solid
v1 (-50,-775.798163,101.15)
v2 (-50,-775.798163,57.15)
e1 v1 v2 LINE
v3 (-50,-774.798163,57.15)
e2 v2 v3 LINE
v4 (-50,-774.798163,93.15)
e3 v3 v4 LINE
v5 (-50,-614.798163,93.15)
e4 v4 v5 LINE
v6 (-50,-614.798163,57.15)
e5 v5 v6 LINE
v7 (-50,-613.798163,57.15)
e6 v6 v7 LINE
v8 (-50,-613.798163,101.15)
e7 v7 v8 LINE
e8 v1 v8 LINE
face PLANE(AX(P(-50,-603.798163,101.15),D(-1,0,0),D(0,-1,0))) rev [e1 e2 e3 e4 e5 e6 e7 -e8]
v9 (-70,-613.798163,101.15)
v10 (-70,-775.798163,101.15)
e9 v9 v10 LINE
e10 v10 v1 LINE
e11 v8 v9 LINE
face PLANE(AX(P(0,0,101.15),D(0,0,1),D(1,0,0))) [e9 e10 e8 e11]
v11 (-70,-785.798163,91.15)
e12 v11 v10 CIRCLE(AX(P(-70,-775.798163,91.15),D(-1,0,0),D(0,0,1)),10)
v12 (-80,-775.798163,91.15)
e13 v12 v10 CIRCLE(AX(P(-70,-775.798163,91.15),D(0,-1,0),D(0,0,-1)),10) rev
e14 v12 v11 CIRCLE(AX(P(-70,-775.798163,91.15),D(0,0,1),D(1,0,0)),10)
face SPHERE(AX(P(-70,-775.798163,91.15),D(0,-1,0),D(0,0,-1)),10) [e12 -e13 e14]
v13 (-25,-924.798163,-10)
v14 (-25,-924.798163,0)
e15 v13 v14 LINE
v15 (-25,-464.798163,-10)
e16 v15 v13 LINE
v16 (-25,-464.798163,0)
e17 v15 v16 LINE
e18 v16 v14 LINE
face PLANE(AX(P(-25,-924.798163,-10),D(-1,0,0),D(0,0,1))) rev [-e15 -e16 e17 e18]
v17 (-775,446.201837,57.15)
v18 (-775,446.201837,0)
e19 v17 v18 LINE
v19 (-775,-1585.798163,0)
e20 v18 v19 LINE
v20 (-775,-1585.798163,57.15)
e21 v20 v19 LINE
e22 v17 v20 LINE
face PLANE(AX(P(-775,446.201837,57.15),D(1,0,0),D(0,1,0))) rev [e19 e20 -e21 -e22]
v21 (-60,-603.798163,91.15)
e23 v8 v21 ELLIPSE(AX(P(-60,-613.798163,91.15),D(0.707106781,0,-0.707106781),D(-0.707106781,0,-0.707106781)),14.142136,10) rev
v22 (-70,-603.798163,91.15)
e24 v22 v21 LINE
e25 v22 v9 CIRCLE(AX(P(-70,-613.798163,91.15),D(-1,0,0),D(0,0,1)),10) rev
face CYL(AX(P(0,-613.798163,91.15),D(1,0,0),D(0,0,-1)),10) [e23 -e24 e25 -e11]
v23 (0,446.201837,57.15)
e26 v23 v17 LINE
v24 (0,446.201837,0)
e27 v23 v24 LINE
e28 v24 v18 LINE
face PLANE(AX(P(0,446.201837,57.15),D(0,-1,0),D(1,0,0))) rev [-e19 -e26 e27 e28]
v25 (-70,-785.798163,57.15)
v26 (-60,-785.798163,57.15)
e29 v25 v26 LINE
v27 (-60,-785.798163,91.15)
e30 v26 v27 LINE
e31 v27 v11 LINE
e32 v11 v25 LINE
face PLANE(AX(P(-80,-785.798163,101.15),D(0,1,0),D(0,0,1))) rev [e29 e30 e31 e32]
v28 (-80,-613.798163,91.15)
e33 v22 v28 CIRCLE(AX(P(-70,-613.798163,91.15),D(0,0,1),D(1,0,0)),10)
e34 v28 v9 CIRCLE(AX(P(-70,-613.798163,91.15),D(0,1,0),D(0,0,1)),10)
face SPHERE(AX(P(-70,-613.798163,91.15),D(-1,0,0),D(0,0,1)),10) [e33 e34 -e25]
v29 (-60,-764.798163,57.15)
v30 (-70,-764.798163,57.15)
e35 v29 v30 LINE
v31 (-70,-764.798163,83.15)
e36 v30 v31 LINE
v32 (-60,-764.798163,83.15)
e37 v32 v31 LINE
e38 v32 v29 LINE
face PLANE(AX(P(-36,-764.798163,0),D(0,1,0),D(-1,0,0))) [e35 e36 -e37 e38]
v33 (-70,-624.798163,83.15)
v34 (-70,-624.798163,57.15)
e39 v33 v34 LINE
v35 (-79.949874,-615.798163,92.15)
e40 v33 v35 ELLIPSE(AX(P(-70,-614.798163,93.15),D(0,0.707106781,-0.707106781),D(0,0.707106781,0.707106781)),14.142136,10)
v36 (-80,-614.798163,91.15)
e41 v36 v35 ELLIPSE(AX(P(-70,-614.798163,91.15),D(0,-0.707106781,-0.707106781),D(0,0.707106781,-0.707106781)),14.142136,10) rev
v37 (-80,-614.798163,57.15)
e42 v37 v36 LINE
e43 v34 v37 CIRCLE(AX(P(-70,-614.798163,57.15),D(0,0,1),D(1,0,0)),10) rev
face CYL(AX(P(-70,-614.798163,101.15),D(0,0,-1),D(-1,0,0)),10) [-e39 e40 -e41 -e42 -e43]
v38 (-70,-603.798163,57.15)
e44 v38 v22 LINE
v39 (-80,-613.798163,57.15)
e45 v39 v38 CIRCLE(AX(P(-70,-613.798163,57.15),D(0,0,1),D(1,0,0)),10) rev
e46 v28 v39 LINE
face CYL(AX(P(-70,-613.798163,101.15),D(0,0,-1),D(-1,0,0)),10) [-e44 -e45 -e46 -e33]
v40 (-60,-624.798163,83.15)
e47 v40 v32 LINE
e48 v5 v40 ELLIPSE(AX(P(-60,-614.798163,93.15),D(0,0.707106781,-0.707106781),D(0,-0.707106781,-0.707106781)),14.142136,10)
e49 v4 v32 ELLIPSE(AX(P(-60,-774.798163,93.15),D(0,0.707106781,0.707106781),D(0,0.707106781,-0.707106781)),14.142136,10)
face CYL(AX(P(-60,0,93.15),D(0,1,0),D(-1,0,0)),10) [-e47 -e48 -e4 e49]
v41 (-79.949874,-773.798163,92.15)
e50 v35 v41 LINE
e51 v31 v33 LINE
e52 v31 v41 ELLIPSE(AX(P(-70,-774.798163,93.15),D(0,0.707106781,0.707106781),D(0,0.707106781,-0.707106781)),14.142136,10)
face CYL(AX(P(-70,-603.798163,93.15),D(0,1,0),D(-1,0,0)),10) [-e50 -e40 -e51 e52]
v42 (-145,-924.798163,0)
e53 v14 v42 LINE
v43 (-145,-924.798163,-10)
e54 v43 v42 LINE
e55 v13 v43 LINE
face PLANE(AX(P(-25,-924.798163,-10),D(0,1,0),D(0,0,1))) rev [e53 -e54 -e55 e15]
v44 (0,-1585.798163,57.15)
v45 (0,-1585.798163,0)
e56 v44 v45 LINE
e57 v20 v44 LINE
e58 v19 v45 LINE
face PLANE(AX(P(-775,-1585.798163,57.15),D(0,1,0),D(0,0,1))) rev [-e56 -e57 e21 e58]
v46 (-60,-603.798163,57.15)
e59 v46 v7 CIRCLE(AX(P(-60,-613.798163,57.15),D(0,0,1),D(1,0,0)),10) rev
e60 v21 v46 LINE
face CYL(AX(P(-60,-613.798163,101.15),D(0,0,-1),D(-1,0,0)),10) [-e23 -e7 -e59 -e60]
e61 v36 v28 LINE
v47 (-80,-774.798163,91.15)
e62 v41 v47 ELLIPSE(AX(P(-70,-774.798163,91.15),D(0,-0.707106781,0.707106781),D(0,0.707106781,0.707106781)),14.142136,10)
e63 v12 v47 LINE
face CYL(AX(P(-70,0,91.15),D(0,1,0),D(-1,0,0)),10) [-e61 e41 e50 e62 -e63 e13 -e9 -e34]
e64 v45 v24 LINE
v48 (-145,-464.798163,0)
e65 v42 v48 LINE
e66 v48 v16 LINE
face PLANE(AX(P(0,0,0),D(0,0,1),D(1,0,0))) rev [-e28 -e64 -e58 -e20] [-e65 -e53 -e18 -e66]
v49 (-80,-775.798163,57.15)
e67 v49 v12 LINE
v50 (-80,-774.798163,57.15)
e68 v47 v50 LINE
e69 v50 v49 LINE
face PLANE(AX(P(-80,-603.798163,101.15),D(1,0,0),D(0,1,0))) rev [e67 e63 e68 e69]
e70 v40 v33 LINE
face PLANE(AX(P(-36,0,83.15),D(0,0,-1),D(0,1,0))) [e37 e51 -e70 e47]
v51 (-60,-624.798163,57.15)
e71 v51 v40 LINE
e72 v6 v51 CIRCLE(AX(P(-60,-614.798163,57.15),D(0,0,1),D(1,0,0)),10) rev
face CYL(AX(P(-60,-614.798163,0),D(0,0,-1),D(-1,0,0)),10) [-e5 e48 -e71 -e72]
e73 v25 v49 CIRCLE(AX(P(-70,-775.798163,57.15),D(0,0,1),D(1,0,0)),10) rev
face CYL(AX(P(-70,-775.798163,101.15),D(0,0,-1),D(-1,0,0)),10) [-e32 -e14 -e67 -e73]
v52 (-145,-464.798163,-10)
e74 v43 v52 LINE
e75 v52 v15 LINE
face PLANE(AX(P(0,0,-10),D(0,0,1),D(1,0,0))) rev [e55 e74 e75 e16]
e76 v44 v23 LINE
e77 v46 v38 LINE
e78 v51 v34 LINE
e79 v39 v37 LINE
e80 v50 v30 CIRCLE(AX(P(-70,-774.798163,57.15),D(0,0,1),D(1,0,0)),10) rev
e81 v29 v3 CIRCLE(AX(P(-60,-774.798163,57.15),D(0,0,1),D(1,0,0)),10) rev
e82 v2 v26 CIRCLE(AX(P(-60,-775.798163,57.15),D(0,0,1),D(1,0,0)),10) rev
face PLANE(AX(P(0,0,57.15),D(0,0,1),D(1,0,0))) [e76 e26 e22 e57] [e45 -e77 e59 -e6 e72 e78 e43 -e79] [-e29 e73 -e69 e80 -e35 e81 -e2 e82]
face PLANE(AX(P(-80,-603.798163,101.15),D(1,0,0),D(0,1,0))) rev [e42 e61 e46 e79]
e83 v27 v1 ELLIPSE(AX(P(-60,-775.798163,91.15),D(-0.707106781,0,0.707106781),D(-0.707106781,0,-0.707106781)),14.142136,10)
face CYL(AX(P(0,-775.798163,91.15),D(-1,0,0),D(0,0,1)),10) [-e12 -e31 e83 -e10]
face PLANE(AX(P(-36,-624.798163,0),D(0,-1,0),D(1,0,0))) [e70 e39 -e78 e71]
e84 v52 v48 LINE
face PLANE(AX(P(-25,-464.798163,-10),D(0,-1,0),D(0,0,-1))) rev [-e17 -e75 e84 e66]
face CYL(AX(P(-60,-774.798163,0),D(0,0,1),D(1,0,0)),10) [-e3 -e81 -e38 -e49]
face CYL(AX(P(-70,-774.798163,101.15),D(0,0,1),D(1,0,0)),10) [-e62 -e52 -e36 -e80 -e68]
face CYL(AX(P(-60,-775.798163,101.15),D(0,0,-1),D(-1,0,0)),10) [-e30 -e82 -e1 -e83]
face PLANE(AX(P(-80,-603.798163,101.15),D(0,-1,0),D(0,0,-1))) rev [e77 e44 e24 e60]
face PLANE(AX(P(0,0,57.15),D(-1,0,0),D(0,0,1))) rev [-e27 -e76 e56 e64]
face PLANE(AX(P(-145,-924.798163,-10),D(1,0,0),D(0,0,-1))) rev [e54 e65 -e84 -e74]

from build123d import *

# Parameters (mm, degrees)
BOSS_EXTRUDE2_DEPTH = 57.15
BOSS_EXTRUDE3_DEPTH = 44
CUT_EXTRUDE1_DEPTH  = 44
FILLET1_R           = 10
SKETCH6_W           = 120
SKETCH6_H           = 460.0000000000001
BOSS_EXTRUDE4_DEPTH = 10


with BuildPart() as part:
    # Sketch1 → Boss-Extrude2 (new body)
    with BuildSketch(Plane.XY):
        Polygon((0, 0), (0, 446.2018372120283), (-775, 446.2018372120282), (-774.9999999999995, -1585.7981627879717), (0, -1585.7981627879717), align=None)
    extrude(amount=BOSS_EXTRUDE2_DEPTH)

    # Sketch4 → Boss-Extrude3 (add)
    with BuildSketch(Plane.XY.offset(57.15)):
        Polygon((-79.99999999999993, -603.7981627879718), (-49.999999999999936, -603.7981627879718), (-49.999999999999915, -785.7981627879718), (-79.9999999999999, -785.7981627879718), align=None)
    extrude(amount=BOSS_EXTRUDE3_DEPTH)

    # Sketch5 → Cut-Extrude1 (cut)
    with BuildSketch(Plane.ZY.offset(80.00000000000003)):
        Polygon((83.14999999999999, -624.7981627879717), (57.150000000000006, -624.7981627879717), (57.15, -764.7981627879717), (83.15, -764.7981627879717), align=None)
    extrude(amount=-CUT_EXTRUDE1_DEPTH, mode=Mode.SUBTRACT)

    # Fillet1
    # the kernel refuses this fillet: 10 mm, written as the material it takes off along each edge
    with BuildSketch(Plane(origin=(-69.99999999999993, -613.7981627879718, 91.15), x_dir=(-1, -1.6e-16, 0), z_dir=(0, 1, 0))) as fillet1_piece_1_section:
        Polygon((0, 0), (FILLET1_R, 0), (FILLET1_R, FILLET1_R), (0, FILLET1_R), align=None)
    fillet1_piece_1 = extrude(amount=FILLET1_R, mode=Mode.PRIVATE)
    fillet1_piece_1 = fillet1_piece_1 - Plane(origin=(-69.99999999999993, -613.7981627879718, 91.15), x_dir=(0.7071067811865475, 0, -0.7071067811865475), z_dir=(0, 1, 0)) * Sphere(FILLET1_R, mode=Mode.PRIVATE)
    add(fillet1_piece_1, mode=Mode.SUBTRACT)
    with BuildSketch(Plane(origin=(-69.9999999999999, -775.7981627879718, 91.15), x_dir=(0, 0, 1), z_dir=(-1, -1.6e-16, 0))) as fillet1_piece_2_section:
        Polygon((0, 0), (FILLET1_R, 0), (FILLET1_R, -FILLET1_R), (0, -FILLET1_R), align=None)
    fillet1_piece_2 = extrude(amount=FILLET1_R, mode=Mode.PRIVATE)
    fillet1_piece_2 = fillet1_piece_2 - Plane(origin=(-69.9999999999999, -775.7981627879718, 91.15), x_dir=(0, 0.7071067811865475, -0.7071067811865475), z_dir=(-1, -1.6e-16, 0)) * Sphere(FILLET1_R, mode=Mode.PRIVATE)
    add(fillet1_piece_2, mode=Mode.SUBTRACT)
    with BuildSketch(Plane(origin=(-49.999999999999915, -785.7981627879718, 57.15), x_dir=(-1, 0, 0), z_dir=(0, 0, 1))) as fillet1_piece_3:
        with BuildLine():
            CenterArc((FILLET1_R, -FILLET1_R), FILLET1_R, 90, 90)
            Line((0, -FILLET1_R), (0, 0))
            Line((0, 0), (FILLET1_R, 0))
        make_face()
    extrude(amount=69, mode=Mode.SUBTRACT)
    with BuildSketch(Plane(origin=(-49.999999999999936, -603.7981627879718, 57.15), x_dir=(0, -1, 0), z_dir=(0, 0, 1))) as fillet1_piece_4:
        with BuildLine():
            CenterArc((FILLET1_R, -FILLET1_R), FILLET1_R, 90, 90)
            Line((0, -FILLET1_R), (0, 0))
            Line((0, 0), (FILLET1_R, 0))
        make_face()
    extrude(amount=69, mode=Mode.SUBTRACT)
    with BuildSketch(Plane(origin=(-79.99999999999993, -603.7981627879718, 57.15), x_dir=(1, 0, 0), z_dir=(0, 0, 1))) as fillet1_piece_5:
        with BuildLine():
            CenterArc((FILLET1_R, -FILLET1_R), FILLET1_R, 90, 90)
            Line((0, -FILLET1_R), (0, 0))
            Line((0, 0), (FILLET1_R, 0))
        make_face()
    extrude(amount=34.00000000000001, mode=Mode.SUBTRACT)
    with BuildSketch(Plane(origin=(-79.9999999999999, -785.7981627879718, 57.15), x_dir=(1, 0, 0), z_dir=(0, 0, 1))) as fillet1_piece_6:
        with BuildLine():
            CenterArc((FILLET1_R, FILLET1_R), FILLET1_R, 180, 90)
            Line((0, FILLET1_R), (0, 0))
            Line((0, 0), (FILLET1_R, 0))
        make_face()
    extrude(amount=34.00000000000001, mode=Mode.SUBTRACT)
    with BuildSketch(Plane(origin=(-69.99999999999993, -603.7981627879718, 101.15), x_dir=(0, 0, -1), z_dir=(1, 0, 0))) as fillet1_piece_7:
        with BuildLine():
            CenterArc((FILLET1_R, -FILLET1_R), FILLET1_R, 90, 90)
            Line((0, -FILLET1_R), (0, 0))
            Line((0, 0), (FILLET1_R, 0))
        make_face()
    extrude(amount=44.99999999999999, mode=Mode.SUBTRACT)
    with BuildSketch(Plane(origin=(-79.9999999999999, -775.7981627879718, 101.15), x_dir=(0, 0, -1), z_dir=(-1.6e-16, 1, 0))) as fillet1_piece_8:
        with BuildLine():
            CenterArc((FILLET1_R, -FILLET1_R), FILLET1_R, 90, 90)
            Line((0, -FILLET1_R), (0, 0))
            Line((0, 0), (FILLET1_R, 0))
        make_face()
    extrude(amount=162, mode=Mode.SUBTRACT)
    with BuildSketch(Plane(origin=(-24.999999999999915, -785.7981627879718, 101.15), x_dir=(0, 0, -1), z_dir=(-1, 0, 0))) as fillet1_piece_9:
        with BuildLine():
            CenterArc((FILLET1_R, -FILLET1_R), FILLET1_R, 90, 90)
            Line((0, -FILLET1_R), (0, 0))
            Line((0, 0), (FILLET1_R, 0))
        make_face()
    extrude(amount=44.999999999999986, mode=Mode.SUBTRACT)
    with BuildSketch(Plane(origin=(-79.99999999999991, -764.7981627879717, 57.15000000000002), x_dir=(1.42e-15, -1, 0), z_dir=(0, 0, 1))) as fillet1_piece_10:
        with BuildLine():
            CenterArc((FILLET1_R, FILLET1_R), FILLET1_R, 180, 89.99999999999989)
            Line((1.421e-14, FILLET1_R), (0, 0))
            Line((0, 0), (FILLET1_R, 0))
        make_face()
    extrude(amount=25.999999999999986, mode=Mode.SUBTRACT)
    with BuildSketch(Plane(origin=(-79.99999999999993, -624.7981627879717, 83.14999999999999), x_dir=(0, 1, 0), z_dir=(0, 0, -1))) as fillet1_piece_11:
        with BuildLine():
            CenterArc((FILLET1_R, FILLET1_R), FILLET1_R, 180, 90)
            Line((0, FILLET1_R), (0, 0))
            Line((0, 0), (FILLET1_R, 0))
        make_face()
    extrude(amount=25.999999999999986, mode=Mode.SUBTRACT)
    with BuildSketch(Plane(origin=(-79.99999999999991, -764.7981627879717, 83.15), x_dir=(1.42e-15, 1e-16, 1), z_dir=(-1.5e-16, 1, -1e-16))) as fillet1_piece_12:
        with BuildLine():
            CenterArc((FILLET1_R, FILLET1_R), FILLET1_R, 180, 89.99999999999989)
            Line((1.421e-14, FILLET1_R), (0, 0))
            Line((0, 0), (FILLET1_R, 0))
        make_face()
    extrude(amount=140, mode=Mode.SUBTRACT)
    with BuildSketch(Plane(origin=(-49.999999999999915, -764.7981627879717, 83.15), x_dir=(0, -1, 0), z_dir=(0, 0, -1))) as fillet1_piece_13:
        with BuildLine():
            CenterArc((FILLET1_R, FILLET1_R), FILLET1_R, 180, 90)
            Line((0, FILLET1_R), (0, 0))
            Line((0, 0), (FILLET1_R, 0))
        make_face()
    extrude(amount=26, mode=Mode.SUBTRACT)
    with BuildSketch(Plane(origin=(-49.999999999999936, -624.7981627879717, 57.150000000000006), x_dir=(0, 1, 0), z_dir=(0, 0, 1))) as fillet1_piece_14:
        with BuildLine():
            CenterArc((FILLET1_R, FILLET1_R), FILLET1_R, 180.00000000000003, 90)
            Line((0, FILLET1_R), (0, 0))
            Line((0, 0), (FILLET1_R, 0))
        make_face()
    extrude(amount=25.999999999999986, mode=Mode.SUBTRACT)
    with BuildSketch(Plane(origin=(-49.999999999999936, -624.7981627879717, 83.15), x_dir=(0, 1e-16, 1), z_dir=(1.2e-16, -1, 1e-16))) as fillet1_piece_15:
        with BuildLine():
            CenterArc((FILLET1_R, FILLET1_R), FILLET1_R, 180, 90)
            Line((0, FILLET1_R), (0, 0))
            Line((0, 0), (FILLET1_R, 0))
        make_face()
    extrude(amount=140, mode=Mode.SUBTRACT)
    with BuildSketch(Plane(origin=(-79.99999999999991, -764.7981627879717, 57.15000000000002), x_dir=(1.42e-15, -1, 0), z_dir=(0, 0, 1))) as fillet1_piece_16a_section:
        with BuildLine():
            CenterArc((FILLET1_R, FILLET1_R), FILLET1_R, 180, 89.99999999999989)
            Line((1.421e-14, FILLET1_R), (0, 0))
            Line((0, 0), (FILLET1_R, 0))
        make_face()
    fillet1_piece_16a = extrude(amount=50.999999999999986, mode=Mode.PRIVATE)
    fillet1_piece_16a = split(fillet1_piece_16a, bisect_by=Plane(origin=(-77.7360488573316, -767.0621139306398, 83.15), z_dir=(0, 1e-16, 1)), keep=Keep.TOP, mode=Mode.PRIVATE)
    with BuildSketch(Plane(origin=(-79.9999999999999, -789.7981627879717, 83.15), x_dir=(0, 1e-16, 1), z_dir=(-1.5e-16, 1, -1e-16))) as fillet1_piece_16b_section:
        with BuildLine():
            CenterArc((FILLET1_R, FILLET1_R), FILLET1_R, 180, 90)
            Line((0, FILLET1_R), (0, 0))
            Line((0, 0), (FILLET1_R, 0))
        make_face()
    fillet1_piece_16b = extrude(amount=165, mode=Mode.PRIVATE)
    fillet1_piece_16b = split(fillet1_piece_16b, bisect_by=Plane(origin=(-77.73604885733165, -764.7981627879717, 85.41395114266827), z_dir=(1.5e-16, -1, 0)), keep=Keep.TOP, mode=Mode.PRIVATE)
    fillet1_piece_16 = fillet1_piece_16a & fillet1_piece_16b
    add(fillet1_piece_16, mode=Mode.SUBTRACT)
    with BuildSketch(Plane(origin=(-79.99999999999991, -764.7981627879717, 83.15), x_dir=(1.42e-15, 1e-16, 1), z_dir=(-1.5e-16, 1, -1e-16))) as fillet1_piece_17a_section:
        with BuildLine():
            CenterArc((FILLET1_R, FILLET1_R), FILLET1_R, 180, 89.99999999999989)
            Line((1.421e-14, FILLET1_R), (0, 0))
            Line((0, 0), (FILLET1_R, 0))
        make_face()
    fillet1_piece_17a = extrude(amount=165, mode=Mode.PRIVATE)
    fillet1_piece_17a = split(fillet1_piece_17a, bisect_by=Plane(origin=(-77.73604885733167, -624.7981627879717, 85.41395114266825), z_dir=(-1.5e-16, 1, 0)), keep=Keep.TOP, mode=Mode.PRIVATE)
    with BuildSketch(Plane(origin=(-79.99999999999993, -624.7981627879717, 108.14999999999998), x_dir=(0, 1, 0), z_dir=(0, 0, -1))) as fillet1_piece_17b_section:
        with BuildLine():
            CenterArc((FILLET1_R, FILLET1_R), FILLET1_R, 180, 90)
            Line((0, FILLET1_R), (0, 0))
            Line((0, 0), (FILLET1_R, 0))
        make_face()
    fillet1_piece_17b = extrude(amount=50.999999999999986, mode=Mode.PRIVATE)
    fillet1_piece_17b = split(fillet1_piece_17b, bisect_by=Plane(origin=(-77.73604885733164, -622.5342116453035, 83.14999999999999), z_dir=(0, 1e-16, 1)), keep=Keep.TOP, mode=Mode.PRIVATE)
    fillet1_piece_17 = fillet1_piece_17a & fillet1_piece_17b
    add(fillet1_piece_17, mode=Mode.SUBTRACT)
    with BuildSketch(Plane(origin=(-49.999999999999936, -624.7981627879717, 83.15), x_dir=(0, 1e-16, 1), z_dir=(1.2e-16, -1, 1e-16))) as fillet1_piece_18a_section:
        with BuildLine():
            CenterArc((FILLET1_R, FILLET1_R), FILLET1_R, 180, 90)
            Line((0, FILLET1_R), (0, 0))
            Line((0, 0), (FILLET1_R, 0))
        make_face()
    fillet1_piece_18a = extrude(amount=165, mode=Mode.PRIVATE)
    fillet1_piece_18a = split(fillet1_piece_18a, bisect_by=Plane(origin=(-52.26395114266817, -764.7981627879717, 85.41395114266827), z_dir=(1.5e-16, -1, 0)), keep=Keep.TOP, mode=Mode.PRIVATE)
    with BuildSketch(Plane(origin=(-49.999999999999915, -764.7981627879717, 108.15), x_dir=(0, -1, 0), z_dir=(0, 0, -1))) as fillet1_piece_18b_section:
        with BuildLine():
            CenterArc((FILLET1_R, FILLET1_R), FILLET1_R, 180, 90)
            Line((0, FILLET1_R), (0, 0))
            Line((0, 0), (FILLET1_R, 0))
        make_face()
    fillet1_piece_18b = extrude(amount=51, mode=Mode.PRIVATE)
    fillet1_piece_18b = split(fillet1_piece_18b, bisect_by=Plane(origin=(-52.2639511426682, -767.0621139306397, 83.15), z_dir=(0, 1e-16, 1)), keep=Keep.TOP, mode=Mode.PRIVATE)
    fillet1_piece_18 = fillet1_piece_18a & fillet1_piece_18b
    add(fillet1_piece_18, mode=Mode.SUBTRACT)
    with BuildSketch(Plane(origin=(-49.999999999999936, -624.7981627879717, 57.150000000000006), x_dir=(0, 1, 0), z_dir=(0, 0, 1))) as fillet1_piece_19a_section:
        with BuildLine():
            CenterArc((FILLET1_R, FILLET1_R), FILLET1_R, 180.00000000000003, 90)
            Line((0, FILLET1_R), (0, 0))
            Line((0, 0), (FILLET1_R, 0))
        make_face()
    fillet1_piece_19a = extrude(amount=50.999999999999986, mode=Mode.PRIVATE)
    fillet1_piece_19a = split(fillet1_piece_19a, bisect_by=Plane(origin=(-52.26395114266823, -622.5342116453035, 83.14999999999999), z_dir=(0, 1e-16, 1)), keep=Keep.TOP, mode=Mode.PRIVATE)
    with BuildSketch(Plane(origin=(-49.999999999999936, -599.7981627879717, 83.14999999999999), x_dir=(0, 1e-16, 1), z_dir=(1.2e-16, -1, 1e-16))) as fillet1_piece_19b_section:
        with BuildLine():
            CenterArc((FILLET1_R, FILLET1_R), FILLET1_R, 179.99999999999997, 90)
            Line((0, FILLET1_R), (0, 0))
            Line((0, 0), (FILLET1_R, 0))
        make_face()
    fillet1_piece_19b = extrude(amount=165, mode=Mode.PRIVATE)
    fillet1_piece_19b = split(fillet1_piece_19b, bisect_by=Plane(origin=(-52.26395114266818, -624.7981627879717, 85.41395114266824), z_dir=(-1.5e-16, 1, 0)), keep=Keep.TOP, mode=Mode.PRIVATE)
    fillet1_piece_19 = fillet1_piece_19a & fillet1_piece_19b
    add(fillet1_piece_19, mode=Mode.SUBTRACT)

    # Sketch6 → Boss-Extrude4 (add)
    with BuildSketch(Plane(origin=(0, 0, 0), x_dir=(-1, 0, 0), z_dir=(0, 0, -1))):
        with Locations((85, -694.7981627879719)):
            Rectangle(SKETCH6_W, SKETCH6_H)
    extrude(amount=BOSS_EXTRUDE4_DEPTH)


solid = part.part
